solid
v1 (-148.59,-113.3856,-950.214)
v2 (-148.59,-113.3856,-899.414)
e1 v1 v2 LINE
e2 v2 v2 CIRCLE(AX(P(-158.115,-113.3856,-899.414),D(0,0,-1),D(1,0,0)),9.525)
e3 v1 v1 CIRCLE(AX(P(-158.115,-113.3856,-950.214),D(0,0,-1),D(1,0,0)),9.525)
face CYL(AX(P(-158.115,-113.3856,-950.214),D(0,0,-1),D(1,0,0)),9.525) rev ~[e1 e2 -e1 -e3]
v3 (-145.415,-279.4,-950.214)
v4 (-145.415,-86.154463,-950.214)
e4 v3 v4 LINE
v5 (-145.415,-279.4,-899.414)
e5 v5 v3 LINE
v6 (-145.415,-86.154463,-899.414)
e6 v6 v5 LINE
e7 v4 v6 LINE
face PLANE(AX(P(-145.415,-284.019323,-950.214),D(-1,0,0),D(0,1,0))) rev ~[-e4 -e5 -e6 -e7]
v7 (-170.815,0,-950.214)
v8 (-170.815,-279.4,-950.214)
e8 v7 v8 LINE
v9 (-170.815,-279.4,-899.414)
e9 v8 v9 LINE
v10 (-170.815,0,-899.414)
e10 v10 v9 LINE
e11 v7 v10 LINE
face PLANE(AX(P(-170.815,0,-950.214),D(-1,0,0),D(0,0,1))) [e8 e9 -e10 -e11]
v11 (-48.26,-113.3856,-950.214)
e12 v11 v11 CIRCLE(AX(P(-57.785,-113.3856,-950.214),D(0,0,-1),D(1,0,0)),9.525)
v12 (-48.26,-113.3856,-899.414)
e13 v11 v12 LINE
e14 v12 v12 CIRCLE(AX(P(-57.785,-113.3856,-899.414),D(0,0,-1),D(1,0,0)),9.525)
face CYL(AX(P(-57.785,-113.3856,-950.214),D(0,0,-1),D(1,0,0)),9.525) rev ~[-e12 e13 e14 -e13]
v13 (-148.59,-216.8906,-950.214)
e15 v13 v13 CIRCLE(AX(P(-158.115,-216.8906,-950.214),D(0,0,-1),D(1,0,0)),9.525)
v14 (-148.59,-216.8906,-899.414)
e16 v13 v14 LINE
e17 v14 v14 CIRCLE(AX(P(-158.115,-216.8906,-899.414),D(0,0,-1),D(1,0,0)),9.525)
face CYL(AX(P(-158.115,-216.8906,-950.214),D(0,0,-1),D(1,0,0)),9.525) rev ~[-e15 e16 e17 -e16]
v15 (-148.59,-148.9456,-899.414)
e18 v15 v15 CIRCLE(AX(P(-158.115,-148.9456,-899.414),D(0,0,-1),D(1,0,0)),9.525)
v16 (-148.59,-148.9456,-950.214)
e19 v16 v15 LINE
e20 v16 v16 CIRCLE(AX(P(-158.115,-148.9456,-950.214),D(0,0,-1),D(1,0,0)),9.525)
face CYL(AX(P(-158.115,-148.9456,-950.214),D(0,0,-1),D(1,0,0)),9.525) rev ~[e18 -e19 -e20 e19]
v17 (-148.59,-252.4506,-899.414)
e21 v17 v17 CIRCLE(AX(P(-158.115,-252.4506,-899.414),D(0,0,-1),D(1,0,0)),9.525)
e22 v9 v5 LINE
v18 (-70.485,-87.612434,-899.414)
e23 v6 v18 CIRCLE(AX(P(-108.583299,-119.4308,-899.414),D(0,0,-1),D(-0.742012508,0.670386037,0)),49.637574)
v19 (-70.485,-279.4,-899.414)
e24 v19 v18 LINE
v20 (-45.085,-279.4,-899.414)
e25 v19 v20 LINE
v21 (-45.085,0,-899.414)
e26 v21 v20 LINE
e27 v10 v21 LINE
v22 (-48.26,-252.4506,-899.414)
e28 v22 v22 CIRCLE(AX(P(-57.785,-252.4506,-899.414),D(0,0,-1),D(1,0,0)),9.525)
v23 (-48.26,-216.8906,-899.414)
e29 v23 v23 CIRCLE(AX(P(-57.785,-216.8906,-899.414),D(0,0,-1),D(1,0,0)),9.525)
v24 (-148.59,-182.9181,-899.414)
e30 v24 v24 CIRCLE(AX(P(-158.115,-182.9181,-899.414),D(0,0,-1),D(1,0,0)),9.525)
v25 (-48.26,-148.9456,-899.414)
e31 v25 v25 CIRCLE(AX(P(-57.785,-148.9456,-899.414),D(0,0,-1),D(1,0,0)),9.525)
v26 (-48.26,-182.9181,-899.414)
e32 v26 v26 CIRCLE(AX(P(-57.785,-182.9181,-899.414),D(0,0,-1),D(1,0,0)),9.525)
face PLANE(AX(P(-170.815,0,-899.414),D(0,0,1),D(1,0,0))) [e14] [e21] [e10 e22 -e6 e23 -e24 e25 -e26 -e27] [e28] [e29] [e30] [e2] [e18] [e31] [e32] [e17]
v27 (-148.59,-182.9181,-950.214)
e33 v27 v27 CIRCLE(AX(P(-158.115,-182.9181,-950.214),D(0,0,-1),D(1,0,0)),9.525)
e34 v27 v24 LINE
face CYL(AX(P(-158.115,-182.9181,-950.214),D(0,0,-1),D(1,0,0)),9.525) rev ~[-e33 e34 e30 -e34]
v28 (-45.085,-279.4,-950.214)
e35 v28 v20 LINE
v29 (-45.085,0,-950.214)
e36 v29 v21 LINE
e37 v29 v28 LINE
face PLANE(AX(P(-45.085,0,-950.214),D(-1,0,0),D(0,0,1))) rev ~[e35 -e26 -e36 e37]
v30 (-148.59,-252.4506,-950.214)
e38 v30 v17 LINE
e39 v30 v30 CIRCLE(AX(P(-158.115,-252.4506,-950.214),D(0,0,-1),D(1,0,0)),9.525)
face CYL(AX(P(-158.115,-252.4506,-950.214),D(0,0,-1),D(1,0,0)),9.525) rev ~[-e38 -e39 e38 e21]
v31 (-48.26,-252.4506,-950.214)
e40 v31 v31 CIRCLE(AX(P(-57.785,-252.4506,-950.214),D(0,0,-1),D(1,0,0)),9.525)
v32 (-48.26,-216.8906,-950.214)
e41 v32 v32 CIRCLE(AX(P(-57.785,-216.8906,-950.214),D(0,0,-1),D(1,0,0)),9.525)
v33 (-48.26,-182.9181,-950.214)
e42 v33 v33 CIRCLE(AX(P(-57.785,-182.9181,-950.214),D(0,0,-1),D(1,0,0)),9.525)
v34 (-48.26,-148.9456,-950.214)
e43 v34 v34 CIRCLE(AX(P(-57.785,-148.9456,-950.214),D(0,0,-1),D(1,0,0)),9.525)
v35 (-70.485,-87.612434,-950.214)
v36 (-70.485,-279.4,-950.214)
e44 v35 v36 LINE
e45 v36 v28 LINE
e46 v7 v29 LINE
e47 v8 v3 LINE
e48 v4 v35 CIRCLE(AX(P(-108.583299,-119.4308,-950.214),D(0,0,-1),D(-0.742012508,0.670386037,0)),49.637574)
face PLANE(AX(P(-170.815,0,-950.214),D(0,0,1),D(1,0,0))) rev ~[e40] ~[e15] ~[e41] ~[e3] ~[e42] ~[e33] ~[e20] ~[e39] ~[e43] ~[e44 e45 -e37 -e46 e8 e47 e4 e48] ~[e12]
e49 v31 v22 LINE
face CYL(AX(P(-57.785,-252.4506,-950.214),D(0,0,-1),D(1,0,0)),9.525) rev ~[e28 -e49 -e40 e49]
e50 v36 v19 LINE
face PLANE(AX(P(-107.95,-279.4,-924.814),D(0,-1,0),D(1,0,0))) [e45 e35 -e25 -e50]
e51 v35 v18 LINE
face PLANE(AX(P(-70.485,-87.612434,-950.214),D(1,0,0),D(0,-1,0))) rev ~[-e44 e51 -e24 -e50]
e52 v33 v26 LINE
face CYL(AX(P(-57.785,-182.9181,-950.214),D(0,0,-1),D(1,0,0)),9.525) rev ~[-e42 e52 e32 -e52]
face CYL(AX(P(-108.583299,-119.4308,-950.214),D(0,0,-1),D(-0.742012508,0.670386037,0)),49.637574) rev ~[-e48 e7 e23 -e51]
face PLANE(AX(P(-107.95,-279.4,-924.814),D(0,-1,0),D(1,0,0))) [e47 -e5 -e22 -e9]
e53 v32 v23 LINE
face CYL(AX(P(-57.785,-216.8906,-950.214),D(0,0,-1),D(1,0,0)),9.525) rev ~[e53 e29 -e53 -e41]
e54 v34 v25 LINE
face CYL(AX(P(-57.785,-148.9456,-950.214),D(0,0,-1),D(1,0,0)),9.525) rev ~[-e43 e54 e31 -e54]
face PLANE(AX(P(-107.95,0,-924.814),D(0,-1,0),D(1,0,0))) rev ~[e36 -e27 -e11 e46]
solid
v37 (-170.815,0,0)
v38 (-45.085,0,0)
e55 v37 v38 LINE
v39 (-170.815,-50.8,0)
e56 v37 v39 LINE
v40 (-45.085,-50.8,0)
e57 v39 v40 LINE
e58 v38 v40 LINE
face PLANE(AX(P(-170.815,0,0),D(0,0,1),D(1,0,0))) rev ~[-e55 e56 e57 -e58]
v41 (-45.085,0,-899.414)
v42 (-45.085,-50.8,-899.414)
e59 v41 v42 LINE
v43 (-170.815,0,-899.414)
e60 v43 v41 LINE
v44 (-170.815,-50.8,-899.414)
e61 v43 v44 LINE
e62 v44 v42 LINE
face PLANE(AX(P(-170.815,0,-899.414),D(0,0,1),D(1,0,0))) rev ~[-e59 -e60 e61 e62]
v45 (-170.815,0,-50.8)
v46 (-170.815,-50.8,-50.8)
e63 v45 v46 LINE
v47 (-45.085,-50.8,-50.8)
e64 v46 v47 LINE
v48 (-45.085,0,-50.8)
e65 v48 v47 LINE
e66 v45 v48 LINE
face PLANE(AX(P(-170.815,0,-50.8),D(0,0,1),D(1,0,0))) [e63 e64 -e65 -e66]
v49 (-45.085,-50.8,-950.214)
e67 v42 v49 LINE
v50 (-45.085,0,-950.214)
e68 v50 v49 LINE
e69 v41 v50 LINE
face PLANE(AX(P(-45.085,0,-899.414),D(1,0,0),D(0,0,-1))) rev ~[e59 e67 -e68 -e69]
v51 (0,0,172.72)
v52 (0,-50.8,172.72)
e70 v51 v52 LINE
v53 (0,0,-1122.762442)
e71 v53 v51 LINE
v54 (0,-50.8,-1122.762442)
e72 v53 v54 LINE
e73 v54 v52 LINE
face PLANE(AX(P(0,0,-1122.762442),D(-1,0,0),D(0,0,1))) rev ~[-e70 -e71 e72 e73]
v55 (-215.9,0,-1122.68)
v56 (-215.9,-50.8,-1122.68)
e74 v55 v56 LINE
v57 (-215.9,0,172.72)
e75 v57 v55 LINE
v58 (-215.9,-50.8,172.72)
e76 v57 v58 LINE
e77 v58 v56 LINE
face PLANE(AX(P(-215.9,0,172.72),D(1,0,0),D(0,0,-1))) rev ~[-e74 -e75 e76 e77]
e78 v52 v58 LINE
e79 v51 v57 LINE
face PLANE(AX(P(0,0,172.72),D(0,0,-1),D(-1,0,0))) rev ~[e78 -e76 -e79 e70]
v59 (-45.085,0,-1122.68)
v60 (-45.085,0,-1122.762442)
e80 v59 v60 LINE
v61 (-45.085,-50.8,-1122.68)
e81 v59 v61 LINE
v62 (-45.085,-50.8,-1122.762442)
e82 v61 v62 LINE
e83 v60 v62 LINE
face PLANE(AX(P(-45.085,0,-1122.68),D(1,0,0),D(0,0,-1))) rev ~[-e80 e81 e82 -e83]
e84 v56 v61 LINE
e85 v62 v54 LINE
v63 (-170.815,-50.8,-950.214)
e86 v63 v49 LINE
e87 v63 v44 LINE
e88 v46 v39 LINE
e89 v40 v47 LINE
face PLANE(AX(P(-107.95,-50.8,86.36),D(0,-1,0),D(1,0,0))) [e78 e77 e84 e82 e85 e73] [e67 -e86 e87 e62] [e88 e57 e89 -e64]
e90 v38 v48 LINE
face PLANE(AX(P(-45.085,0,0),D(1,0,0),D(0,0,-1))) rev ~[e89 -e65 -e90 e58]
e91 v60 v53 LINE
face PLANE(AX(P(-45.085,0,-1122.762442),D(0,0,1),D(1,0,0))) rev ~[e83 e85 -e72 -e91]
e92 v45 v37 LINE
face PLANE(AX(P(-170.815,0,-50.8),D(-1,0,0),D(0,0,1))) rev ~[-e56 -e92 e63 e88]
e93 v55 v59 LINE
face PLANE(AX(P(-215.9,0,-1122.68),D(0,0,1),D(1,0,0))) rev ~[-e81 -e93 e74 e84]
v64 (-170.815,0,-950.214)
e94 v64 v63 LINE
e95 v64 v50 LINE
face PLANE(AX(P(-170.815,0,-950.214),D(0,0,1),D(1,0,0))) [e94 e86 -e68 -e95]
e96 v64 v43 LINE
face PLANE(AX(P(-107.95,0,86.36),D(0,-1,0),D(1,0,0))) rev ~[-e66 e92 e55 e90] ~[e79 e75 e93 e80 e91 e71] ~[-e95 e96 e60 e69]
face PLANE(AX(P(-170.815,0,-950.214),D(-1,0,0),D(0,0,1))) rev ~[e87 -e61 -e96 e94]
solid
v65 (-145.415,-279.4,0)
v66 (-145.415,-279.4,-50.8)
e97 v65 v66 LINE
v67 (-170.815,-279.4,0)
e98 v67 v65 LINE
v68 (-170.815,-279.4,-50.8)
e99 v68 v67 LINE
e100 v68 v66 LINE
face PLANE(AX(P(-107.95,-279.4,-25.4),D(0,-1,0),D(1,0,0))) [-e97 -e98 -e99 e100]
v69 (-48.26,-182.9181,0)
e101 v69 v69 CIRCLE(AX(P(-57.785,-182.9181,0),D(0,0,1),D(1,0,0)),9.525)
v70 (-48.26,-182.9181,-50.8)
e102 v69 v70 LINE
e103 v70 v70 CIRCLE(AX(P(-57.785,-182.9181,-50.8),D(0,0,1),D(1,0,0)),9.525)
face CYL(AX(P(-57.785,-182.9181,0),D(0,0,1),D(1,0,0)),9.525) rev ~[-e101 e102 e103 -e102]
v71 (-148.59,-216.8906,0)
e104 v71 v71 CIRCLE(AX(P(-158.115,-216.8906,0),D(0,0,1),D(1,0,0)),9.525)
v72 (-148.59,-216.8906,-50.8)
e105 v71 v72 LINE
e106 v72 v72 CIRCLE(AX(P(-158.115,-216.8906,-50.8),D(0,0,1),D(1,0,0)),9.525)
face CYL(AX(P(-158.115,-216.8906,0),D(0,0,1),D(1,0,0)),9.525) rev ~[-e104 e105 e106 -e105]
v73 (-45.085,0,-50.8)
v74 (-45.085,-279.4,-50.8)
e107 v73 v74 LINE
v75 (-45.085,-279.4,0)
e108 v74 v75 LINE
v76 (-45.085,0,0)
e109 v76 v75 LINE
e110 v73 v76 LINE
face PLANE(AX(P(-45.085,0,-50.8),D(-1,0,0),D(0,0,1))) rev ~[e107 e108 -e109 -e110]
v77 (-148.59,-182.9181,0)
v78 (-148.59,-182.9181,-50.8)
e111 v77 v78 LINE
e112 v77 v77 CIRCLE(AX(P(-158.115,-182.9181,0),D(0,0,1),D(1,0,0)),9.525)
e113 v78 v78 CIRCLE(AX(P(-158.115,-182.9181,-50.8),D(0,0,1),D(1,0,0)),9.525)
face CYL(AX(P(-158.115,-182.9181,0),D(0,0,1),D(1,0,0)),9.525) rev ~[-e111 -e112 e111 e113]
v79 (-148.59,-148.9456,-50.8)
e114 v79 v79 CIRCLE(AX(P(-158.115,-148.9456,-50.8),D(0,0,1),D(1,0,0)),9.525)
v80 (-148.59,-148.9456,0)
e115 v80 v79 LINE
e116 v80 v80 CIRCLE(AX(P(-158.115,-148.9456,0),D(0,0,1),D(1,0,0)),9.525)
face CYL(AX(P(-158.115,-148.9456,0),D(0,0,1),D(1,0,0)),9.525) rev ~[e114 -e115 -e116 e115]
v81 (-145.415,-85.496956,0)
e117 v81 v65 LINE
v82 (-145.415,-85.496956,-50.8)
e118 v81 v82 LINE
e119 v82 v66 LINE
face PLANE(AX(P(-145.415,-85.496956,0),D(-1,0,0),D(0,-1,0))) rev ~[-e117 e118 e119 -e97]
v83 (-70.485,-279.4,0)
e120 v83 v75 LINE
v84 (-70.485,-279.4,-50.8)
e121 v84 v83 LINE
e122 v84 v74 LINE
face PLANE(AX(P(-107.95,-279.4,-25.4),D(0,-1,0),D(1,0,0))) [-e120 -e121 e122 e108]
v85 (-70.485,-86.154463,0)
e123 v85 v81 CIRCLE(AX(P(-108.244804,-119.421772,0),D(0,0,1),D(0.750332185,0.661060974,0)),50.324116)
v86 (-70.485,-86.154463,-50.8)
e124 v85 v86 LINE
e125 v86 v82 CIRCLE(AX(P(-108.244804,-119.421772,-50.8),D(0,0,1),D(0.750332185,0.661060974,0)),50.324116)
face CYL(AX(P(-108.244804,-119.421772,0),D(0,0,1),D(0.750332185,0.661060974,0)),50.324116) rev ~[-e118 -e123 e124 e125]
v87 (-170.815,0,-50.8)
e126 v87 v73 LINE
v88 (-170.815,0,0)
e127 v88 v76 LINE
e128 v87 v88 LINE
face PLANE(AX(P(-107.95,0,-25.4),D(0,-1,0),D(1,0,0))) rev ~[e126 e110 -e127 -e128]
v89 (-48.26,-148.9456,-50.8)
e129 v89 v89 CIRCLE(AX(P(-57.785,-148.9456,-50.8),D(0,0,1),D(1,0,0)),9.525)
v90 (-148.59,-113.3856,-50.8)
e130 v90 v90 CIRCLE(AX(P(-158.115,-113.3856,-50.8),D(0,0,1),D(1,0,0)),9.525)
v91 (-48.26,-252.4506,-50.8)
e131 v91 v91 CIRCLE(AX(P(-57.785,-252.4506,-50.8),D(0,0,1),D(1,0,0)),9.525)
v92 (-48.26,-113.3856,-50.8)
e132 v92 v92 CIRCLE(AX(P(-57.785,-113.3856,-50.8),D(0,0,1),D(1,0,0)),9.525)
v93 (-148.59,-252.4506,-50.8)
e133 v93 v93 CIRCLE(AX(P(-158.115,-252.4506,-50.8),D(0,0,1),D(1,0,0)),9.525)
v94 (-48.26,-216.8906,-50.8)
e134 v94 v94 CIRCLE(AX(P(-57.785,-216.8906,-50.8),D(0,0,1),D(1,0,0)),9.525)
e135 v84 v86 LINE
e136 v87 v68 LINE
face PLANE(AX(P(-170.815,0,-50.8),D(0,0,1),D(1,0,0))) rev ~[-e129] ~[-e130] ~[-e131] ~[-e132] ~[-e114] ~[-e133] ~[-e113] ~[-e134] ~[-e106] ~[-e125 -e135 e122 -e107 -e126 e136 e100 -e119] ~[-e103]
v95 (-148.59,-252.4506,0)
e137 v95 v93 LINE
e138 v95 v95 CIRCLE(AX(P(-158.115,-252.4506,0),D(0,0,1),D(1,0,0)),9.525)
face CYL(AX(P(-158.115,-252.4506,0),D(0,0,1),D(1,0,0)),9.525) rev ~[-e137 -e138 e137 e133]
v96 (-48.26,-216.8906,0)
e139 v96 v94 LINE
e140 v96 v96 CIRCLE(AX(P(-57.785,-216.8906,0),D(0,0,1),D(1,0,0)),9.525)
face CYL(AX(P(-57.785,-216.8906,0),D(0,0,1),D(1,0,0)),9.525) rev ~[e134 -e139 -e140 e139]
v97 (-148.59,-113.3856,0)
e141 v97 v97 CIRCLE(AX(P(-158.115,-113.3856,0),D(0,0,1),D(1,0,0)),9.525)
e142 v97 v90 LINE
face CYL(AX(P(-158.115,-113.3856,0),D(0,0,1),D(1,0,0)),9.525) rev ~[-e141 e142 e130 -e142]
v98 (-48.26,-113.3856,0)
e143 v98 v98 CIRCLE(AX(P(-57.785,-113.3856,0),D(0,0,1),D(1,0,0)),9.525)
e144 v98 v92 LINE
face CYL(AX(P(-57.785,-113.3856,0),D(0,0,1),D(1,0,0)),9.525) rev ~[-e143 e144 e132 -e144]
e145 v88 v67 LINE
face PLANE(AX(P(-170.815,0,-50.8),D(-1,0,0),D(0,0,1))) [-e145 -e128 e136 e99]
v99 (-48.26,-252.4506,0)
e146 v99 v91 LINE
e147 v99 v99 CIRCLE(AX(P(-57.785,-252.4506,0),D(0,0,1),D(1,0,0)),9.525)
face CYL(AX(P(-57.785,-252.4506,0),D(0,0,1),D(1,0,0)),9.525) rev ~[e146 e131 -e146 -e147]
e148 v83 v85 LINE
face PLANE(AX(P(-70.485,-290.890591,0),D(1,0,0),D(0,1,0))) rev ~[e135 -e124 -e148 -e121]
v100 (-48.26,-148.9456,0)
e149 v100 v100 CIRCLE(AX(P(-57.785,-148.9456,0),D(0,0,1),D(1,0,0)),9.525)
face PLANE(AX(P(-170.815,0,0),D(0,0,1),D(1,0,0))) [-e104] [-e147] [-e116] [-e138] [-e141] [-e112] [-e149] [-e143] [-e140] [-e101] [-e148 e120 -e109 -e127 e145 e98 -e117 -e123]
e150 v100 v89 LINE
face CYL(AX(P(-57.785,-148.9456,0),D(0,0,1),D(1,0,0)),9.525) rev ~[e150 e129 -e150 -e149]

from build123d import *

# Parameters (mm, degrees)
F0_W      = 125.73
F0_H      = 172.72
F0_H_2    = 848.614
F0_H_3    = 172.466
F1_DEPTH  = 50.8
F0_H_4    = 50.8
F2_DEPTH  = 279.4
F3_W      = 74.93
F3_H      = 4.6193234962
F4_DEPTH  = 154.94
F5_W      = 74.93
F5_H      = 11.4905911902
F6_DEPTH  = 111.76
F7_R      = 9.525
F9_DEPTH  = 53.34
F10_R     = 9.525
F11_DEPTH = 53.34
F12_R     = 9.525
F13_DEPTH = 53.34


# Not quite as in the source:
# - a feature names something its author has since deleted; it is built from what else it names


with BuildPart() as f1:
    # F0 (on Front) → F1 (new body)
    with BuildSketch(Plane.XZ):
        with Locations((-107.95, 86.36)):
            Rectangle(F0_W, F0_H)
        with Locations((-107.95, -475.107)):
            Rectangle(F0_W, F0_H_2)
        with Locations((-107.95, -1036.447)):
            Rectangle(F0_W, F0_H_3)
        Polygon((-170.815, 0), (-170.815, 172.72), (-215.9, 172.72), (-215.9, -1122.68), (-170.815, -1122.68), (-170.815, -950.214), (-170.815, -899.414), (-170.815, -50.8), align=None)
        Polygon((0, 172.72), (-45.085, 172.72), (-45.085, 0), (-45.085, -50.8), (-45.085, -899.414), (-45.085, -950.214), (-45.085, -1122.68), (-45.085, -1122.7624416351), (0, -1122.7624416351), align=None)
    extrude(amount=F1_DEPTH)


with BuildPart() as f2:
    # F0 (on Front) → F2 (new body)
    with BuildSketch(Plane.XZ):
        with Locations((-107.95, -25.4)):
            Rectangle(F0_W, F0_H_4)
    extrude(amount=F2_DEPTH)

    # F5 (on face) → F6 (cut)
    with BuildSketch(Plane.XY):
        with Locations((-107.95, -285.1452955951)):
            Rectangle(F5_W, F5_H)
        with BuildLine():
            Line((-145.415, -85.4969564537), (-145.415, -279.4))
            Line((-145.415, -279.4), (-70.485, -279.4))
            Line((-70.485, -279.4), (-70.485, -86.1544632))
            ThreePointArc((-70.485, -86.1544632), (-107.803229226, -69.0995938432), (-145.415, -85.4969564537))
        make_face()
    extrude(amount=-F6_DEPTH, mode=Mode.SUBTRACT)

    # F7 (on face) → F9 (cut)
    with BuildSketch(Plane.XY):
        with Locations((-57.785, -113.3856)):
            Circle(F7_R)
        with Locations((-57.785, -148.9456)):
            Circle(F7_R)
        with Locations((-57.785, -182.9181)):
            Circle(F7_R)
        with Locations((-57.785, -252.4506)):
            Circle(F7_R)
        with Locations((-57.785, -216.8906)):
            Circle(F7_R)
    extrude(amount=-F9_DEPTH, mode=Mode.SUBTRACT)

    # F10 (on face) → F11 (cut)
    with BuildSketch(Plane.XY):
        with Locations((-158.115, -113.3856)):
            Circle(F10_R)
        with Locations((-158.115, -148.9456)):
            Circle(F10_R)
        with Locations((-158.115, -182.9181)):
            Circle(F10_R)
        with Locations((-158.115, -216.8906)):
            Circle(F10_R)
        with Locations((-158.115, -252.4506)):
            Circle(F10_R)
    extrude(amount=-F11_DEPTH, mode=Mode.SUBTRACT)


with BuildPart() as f2b:
    # F0 (on Front) → F2, piece 2 (new body)
    with BuildSketch(Plane.XZ):
        with Locations((-107.95, -924.814)):
            Rectangle(F0_W, F0_H_4)
    extrude(amount=F2_DEPTH)

    # F3 (on face) → F4 (cut)
    with BuildSketch(Plane(origin=(0, 0, -950.214), x_dir=(1, 0, 0), z_dir=(0, 0, -1))):
        with Locations((-107.95, 281.7096617481)):
            Rectangle(F3_W, F3_H)
        with BuildLine():
            Line((-70.485, 87.6124339393), (-70.485, 279.4))
            Line((-70.485, 279.4), (-145.415, 279.4))
            Line((-145.415, 279.4), (-145.415, 86.1544632))
            ThreePointArc((-145.415, 86.1544632), (-107.617645147, 69.8026193953), (-70.485, 87.6124339393))
        make_face()
    extrude(amount=-F4_DEPTH, mode=Mode.SUBTRACT)

    # F12 (on face) → F13 (cut)
    with BuildSketch(Plane(origin=(0, 0, -950.214), x_dir=(1, 0, 0), z_dir=(0, 0, -1))):
        with Locations((-158.115, 113.3856)):
            Circle(F12_R)
        with Locations((-158.115, 148.9456)):
            Circle(F12_R)
        with Locations((-158.115, 182.9181)):
            Circle(F12_R)
        with Locations((-158.115, 216.8906)):
            Circle(F12_R)
        with Locations((-158.115, 252.4506)):
            Circle(F12_R)
        with Locations((-57.785, 113.3856)):
            Circle(F12_R)
        with Locations((-57.785, 148.9456)):
            Circle(F12_R)
        with Locations((-57.785, 182.9181)):
            Circle(F12_R)
        with Locations((-57.785, 216.8906)):
            Circle(F12_R)
        with Locations((-57.785, 252.4506)):
            Circle(F12_R)
    extrude(amount=-F13_DEPTH, mode=Mode.SUBTRACT)


solid = Compound([f1.part, f2.part, f2b.part])
